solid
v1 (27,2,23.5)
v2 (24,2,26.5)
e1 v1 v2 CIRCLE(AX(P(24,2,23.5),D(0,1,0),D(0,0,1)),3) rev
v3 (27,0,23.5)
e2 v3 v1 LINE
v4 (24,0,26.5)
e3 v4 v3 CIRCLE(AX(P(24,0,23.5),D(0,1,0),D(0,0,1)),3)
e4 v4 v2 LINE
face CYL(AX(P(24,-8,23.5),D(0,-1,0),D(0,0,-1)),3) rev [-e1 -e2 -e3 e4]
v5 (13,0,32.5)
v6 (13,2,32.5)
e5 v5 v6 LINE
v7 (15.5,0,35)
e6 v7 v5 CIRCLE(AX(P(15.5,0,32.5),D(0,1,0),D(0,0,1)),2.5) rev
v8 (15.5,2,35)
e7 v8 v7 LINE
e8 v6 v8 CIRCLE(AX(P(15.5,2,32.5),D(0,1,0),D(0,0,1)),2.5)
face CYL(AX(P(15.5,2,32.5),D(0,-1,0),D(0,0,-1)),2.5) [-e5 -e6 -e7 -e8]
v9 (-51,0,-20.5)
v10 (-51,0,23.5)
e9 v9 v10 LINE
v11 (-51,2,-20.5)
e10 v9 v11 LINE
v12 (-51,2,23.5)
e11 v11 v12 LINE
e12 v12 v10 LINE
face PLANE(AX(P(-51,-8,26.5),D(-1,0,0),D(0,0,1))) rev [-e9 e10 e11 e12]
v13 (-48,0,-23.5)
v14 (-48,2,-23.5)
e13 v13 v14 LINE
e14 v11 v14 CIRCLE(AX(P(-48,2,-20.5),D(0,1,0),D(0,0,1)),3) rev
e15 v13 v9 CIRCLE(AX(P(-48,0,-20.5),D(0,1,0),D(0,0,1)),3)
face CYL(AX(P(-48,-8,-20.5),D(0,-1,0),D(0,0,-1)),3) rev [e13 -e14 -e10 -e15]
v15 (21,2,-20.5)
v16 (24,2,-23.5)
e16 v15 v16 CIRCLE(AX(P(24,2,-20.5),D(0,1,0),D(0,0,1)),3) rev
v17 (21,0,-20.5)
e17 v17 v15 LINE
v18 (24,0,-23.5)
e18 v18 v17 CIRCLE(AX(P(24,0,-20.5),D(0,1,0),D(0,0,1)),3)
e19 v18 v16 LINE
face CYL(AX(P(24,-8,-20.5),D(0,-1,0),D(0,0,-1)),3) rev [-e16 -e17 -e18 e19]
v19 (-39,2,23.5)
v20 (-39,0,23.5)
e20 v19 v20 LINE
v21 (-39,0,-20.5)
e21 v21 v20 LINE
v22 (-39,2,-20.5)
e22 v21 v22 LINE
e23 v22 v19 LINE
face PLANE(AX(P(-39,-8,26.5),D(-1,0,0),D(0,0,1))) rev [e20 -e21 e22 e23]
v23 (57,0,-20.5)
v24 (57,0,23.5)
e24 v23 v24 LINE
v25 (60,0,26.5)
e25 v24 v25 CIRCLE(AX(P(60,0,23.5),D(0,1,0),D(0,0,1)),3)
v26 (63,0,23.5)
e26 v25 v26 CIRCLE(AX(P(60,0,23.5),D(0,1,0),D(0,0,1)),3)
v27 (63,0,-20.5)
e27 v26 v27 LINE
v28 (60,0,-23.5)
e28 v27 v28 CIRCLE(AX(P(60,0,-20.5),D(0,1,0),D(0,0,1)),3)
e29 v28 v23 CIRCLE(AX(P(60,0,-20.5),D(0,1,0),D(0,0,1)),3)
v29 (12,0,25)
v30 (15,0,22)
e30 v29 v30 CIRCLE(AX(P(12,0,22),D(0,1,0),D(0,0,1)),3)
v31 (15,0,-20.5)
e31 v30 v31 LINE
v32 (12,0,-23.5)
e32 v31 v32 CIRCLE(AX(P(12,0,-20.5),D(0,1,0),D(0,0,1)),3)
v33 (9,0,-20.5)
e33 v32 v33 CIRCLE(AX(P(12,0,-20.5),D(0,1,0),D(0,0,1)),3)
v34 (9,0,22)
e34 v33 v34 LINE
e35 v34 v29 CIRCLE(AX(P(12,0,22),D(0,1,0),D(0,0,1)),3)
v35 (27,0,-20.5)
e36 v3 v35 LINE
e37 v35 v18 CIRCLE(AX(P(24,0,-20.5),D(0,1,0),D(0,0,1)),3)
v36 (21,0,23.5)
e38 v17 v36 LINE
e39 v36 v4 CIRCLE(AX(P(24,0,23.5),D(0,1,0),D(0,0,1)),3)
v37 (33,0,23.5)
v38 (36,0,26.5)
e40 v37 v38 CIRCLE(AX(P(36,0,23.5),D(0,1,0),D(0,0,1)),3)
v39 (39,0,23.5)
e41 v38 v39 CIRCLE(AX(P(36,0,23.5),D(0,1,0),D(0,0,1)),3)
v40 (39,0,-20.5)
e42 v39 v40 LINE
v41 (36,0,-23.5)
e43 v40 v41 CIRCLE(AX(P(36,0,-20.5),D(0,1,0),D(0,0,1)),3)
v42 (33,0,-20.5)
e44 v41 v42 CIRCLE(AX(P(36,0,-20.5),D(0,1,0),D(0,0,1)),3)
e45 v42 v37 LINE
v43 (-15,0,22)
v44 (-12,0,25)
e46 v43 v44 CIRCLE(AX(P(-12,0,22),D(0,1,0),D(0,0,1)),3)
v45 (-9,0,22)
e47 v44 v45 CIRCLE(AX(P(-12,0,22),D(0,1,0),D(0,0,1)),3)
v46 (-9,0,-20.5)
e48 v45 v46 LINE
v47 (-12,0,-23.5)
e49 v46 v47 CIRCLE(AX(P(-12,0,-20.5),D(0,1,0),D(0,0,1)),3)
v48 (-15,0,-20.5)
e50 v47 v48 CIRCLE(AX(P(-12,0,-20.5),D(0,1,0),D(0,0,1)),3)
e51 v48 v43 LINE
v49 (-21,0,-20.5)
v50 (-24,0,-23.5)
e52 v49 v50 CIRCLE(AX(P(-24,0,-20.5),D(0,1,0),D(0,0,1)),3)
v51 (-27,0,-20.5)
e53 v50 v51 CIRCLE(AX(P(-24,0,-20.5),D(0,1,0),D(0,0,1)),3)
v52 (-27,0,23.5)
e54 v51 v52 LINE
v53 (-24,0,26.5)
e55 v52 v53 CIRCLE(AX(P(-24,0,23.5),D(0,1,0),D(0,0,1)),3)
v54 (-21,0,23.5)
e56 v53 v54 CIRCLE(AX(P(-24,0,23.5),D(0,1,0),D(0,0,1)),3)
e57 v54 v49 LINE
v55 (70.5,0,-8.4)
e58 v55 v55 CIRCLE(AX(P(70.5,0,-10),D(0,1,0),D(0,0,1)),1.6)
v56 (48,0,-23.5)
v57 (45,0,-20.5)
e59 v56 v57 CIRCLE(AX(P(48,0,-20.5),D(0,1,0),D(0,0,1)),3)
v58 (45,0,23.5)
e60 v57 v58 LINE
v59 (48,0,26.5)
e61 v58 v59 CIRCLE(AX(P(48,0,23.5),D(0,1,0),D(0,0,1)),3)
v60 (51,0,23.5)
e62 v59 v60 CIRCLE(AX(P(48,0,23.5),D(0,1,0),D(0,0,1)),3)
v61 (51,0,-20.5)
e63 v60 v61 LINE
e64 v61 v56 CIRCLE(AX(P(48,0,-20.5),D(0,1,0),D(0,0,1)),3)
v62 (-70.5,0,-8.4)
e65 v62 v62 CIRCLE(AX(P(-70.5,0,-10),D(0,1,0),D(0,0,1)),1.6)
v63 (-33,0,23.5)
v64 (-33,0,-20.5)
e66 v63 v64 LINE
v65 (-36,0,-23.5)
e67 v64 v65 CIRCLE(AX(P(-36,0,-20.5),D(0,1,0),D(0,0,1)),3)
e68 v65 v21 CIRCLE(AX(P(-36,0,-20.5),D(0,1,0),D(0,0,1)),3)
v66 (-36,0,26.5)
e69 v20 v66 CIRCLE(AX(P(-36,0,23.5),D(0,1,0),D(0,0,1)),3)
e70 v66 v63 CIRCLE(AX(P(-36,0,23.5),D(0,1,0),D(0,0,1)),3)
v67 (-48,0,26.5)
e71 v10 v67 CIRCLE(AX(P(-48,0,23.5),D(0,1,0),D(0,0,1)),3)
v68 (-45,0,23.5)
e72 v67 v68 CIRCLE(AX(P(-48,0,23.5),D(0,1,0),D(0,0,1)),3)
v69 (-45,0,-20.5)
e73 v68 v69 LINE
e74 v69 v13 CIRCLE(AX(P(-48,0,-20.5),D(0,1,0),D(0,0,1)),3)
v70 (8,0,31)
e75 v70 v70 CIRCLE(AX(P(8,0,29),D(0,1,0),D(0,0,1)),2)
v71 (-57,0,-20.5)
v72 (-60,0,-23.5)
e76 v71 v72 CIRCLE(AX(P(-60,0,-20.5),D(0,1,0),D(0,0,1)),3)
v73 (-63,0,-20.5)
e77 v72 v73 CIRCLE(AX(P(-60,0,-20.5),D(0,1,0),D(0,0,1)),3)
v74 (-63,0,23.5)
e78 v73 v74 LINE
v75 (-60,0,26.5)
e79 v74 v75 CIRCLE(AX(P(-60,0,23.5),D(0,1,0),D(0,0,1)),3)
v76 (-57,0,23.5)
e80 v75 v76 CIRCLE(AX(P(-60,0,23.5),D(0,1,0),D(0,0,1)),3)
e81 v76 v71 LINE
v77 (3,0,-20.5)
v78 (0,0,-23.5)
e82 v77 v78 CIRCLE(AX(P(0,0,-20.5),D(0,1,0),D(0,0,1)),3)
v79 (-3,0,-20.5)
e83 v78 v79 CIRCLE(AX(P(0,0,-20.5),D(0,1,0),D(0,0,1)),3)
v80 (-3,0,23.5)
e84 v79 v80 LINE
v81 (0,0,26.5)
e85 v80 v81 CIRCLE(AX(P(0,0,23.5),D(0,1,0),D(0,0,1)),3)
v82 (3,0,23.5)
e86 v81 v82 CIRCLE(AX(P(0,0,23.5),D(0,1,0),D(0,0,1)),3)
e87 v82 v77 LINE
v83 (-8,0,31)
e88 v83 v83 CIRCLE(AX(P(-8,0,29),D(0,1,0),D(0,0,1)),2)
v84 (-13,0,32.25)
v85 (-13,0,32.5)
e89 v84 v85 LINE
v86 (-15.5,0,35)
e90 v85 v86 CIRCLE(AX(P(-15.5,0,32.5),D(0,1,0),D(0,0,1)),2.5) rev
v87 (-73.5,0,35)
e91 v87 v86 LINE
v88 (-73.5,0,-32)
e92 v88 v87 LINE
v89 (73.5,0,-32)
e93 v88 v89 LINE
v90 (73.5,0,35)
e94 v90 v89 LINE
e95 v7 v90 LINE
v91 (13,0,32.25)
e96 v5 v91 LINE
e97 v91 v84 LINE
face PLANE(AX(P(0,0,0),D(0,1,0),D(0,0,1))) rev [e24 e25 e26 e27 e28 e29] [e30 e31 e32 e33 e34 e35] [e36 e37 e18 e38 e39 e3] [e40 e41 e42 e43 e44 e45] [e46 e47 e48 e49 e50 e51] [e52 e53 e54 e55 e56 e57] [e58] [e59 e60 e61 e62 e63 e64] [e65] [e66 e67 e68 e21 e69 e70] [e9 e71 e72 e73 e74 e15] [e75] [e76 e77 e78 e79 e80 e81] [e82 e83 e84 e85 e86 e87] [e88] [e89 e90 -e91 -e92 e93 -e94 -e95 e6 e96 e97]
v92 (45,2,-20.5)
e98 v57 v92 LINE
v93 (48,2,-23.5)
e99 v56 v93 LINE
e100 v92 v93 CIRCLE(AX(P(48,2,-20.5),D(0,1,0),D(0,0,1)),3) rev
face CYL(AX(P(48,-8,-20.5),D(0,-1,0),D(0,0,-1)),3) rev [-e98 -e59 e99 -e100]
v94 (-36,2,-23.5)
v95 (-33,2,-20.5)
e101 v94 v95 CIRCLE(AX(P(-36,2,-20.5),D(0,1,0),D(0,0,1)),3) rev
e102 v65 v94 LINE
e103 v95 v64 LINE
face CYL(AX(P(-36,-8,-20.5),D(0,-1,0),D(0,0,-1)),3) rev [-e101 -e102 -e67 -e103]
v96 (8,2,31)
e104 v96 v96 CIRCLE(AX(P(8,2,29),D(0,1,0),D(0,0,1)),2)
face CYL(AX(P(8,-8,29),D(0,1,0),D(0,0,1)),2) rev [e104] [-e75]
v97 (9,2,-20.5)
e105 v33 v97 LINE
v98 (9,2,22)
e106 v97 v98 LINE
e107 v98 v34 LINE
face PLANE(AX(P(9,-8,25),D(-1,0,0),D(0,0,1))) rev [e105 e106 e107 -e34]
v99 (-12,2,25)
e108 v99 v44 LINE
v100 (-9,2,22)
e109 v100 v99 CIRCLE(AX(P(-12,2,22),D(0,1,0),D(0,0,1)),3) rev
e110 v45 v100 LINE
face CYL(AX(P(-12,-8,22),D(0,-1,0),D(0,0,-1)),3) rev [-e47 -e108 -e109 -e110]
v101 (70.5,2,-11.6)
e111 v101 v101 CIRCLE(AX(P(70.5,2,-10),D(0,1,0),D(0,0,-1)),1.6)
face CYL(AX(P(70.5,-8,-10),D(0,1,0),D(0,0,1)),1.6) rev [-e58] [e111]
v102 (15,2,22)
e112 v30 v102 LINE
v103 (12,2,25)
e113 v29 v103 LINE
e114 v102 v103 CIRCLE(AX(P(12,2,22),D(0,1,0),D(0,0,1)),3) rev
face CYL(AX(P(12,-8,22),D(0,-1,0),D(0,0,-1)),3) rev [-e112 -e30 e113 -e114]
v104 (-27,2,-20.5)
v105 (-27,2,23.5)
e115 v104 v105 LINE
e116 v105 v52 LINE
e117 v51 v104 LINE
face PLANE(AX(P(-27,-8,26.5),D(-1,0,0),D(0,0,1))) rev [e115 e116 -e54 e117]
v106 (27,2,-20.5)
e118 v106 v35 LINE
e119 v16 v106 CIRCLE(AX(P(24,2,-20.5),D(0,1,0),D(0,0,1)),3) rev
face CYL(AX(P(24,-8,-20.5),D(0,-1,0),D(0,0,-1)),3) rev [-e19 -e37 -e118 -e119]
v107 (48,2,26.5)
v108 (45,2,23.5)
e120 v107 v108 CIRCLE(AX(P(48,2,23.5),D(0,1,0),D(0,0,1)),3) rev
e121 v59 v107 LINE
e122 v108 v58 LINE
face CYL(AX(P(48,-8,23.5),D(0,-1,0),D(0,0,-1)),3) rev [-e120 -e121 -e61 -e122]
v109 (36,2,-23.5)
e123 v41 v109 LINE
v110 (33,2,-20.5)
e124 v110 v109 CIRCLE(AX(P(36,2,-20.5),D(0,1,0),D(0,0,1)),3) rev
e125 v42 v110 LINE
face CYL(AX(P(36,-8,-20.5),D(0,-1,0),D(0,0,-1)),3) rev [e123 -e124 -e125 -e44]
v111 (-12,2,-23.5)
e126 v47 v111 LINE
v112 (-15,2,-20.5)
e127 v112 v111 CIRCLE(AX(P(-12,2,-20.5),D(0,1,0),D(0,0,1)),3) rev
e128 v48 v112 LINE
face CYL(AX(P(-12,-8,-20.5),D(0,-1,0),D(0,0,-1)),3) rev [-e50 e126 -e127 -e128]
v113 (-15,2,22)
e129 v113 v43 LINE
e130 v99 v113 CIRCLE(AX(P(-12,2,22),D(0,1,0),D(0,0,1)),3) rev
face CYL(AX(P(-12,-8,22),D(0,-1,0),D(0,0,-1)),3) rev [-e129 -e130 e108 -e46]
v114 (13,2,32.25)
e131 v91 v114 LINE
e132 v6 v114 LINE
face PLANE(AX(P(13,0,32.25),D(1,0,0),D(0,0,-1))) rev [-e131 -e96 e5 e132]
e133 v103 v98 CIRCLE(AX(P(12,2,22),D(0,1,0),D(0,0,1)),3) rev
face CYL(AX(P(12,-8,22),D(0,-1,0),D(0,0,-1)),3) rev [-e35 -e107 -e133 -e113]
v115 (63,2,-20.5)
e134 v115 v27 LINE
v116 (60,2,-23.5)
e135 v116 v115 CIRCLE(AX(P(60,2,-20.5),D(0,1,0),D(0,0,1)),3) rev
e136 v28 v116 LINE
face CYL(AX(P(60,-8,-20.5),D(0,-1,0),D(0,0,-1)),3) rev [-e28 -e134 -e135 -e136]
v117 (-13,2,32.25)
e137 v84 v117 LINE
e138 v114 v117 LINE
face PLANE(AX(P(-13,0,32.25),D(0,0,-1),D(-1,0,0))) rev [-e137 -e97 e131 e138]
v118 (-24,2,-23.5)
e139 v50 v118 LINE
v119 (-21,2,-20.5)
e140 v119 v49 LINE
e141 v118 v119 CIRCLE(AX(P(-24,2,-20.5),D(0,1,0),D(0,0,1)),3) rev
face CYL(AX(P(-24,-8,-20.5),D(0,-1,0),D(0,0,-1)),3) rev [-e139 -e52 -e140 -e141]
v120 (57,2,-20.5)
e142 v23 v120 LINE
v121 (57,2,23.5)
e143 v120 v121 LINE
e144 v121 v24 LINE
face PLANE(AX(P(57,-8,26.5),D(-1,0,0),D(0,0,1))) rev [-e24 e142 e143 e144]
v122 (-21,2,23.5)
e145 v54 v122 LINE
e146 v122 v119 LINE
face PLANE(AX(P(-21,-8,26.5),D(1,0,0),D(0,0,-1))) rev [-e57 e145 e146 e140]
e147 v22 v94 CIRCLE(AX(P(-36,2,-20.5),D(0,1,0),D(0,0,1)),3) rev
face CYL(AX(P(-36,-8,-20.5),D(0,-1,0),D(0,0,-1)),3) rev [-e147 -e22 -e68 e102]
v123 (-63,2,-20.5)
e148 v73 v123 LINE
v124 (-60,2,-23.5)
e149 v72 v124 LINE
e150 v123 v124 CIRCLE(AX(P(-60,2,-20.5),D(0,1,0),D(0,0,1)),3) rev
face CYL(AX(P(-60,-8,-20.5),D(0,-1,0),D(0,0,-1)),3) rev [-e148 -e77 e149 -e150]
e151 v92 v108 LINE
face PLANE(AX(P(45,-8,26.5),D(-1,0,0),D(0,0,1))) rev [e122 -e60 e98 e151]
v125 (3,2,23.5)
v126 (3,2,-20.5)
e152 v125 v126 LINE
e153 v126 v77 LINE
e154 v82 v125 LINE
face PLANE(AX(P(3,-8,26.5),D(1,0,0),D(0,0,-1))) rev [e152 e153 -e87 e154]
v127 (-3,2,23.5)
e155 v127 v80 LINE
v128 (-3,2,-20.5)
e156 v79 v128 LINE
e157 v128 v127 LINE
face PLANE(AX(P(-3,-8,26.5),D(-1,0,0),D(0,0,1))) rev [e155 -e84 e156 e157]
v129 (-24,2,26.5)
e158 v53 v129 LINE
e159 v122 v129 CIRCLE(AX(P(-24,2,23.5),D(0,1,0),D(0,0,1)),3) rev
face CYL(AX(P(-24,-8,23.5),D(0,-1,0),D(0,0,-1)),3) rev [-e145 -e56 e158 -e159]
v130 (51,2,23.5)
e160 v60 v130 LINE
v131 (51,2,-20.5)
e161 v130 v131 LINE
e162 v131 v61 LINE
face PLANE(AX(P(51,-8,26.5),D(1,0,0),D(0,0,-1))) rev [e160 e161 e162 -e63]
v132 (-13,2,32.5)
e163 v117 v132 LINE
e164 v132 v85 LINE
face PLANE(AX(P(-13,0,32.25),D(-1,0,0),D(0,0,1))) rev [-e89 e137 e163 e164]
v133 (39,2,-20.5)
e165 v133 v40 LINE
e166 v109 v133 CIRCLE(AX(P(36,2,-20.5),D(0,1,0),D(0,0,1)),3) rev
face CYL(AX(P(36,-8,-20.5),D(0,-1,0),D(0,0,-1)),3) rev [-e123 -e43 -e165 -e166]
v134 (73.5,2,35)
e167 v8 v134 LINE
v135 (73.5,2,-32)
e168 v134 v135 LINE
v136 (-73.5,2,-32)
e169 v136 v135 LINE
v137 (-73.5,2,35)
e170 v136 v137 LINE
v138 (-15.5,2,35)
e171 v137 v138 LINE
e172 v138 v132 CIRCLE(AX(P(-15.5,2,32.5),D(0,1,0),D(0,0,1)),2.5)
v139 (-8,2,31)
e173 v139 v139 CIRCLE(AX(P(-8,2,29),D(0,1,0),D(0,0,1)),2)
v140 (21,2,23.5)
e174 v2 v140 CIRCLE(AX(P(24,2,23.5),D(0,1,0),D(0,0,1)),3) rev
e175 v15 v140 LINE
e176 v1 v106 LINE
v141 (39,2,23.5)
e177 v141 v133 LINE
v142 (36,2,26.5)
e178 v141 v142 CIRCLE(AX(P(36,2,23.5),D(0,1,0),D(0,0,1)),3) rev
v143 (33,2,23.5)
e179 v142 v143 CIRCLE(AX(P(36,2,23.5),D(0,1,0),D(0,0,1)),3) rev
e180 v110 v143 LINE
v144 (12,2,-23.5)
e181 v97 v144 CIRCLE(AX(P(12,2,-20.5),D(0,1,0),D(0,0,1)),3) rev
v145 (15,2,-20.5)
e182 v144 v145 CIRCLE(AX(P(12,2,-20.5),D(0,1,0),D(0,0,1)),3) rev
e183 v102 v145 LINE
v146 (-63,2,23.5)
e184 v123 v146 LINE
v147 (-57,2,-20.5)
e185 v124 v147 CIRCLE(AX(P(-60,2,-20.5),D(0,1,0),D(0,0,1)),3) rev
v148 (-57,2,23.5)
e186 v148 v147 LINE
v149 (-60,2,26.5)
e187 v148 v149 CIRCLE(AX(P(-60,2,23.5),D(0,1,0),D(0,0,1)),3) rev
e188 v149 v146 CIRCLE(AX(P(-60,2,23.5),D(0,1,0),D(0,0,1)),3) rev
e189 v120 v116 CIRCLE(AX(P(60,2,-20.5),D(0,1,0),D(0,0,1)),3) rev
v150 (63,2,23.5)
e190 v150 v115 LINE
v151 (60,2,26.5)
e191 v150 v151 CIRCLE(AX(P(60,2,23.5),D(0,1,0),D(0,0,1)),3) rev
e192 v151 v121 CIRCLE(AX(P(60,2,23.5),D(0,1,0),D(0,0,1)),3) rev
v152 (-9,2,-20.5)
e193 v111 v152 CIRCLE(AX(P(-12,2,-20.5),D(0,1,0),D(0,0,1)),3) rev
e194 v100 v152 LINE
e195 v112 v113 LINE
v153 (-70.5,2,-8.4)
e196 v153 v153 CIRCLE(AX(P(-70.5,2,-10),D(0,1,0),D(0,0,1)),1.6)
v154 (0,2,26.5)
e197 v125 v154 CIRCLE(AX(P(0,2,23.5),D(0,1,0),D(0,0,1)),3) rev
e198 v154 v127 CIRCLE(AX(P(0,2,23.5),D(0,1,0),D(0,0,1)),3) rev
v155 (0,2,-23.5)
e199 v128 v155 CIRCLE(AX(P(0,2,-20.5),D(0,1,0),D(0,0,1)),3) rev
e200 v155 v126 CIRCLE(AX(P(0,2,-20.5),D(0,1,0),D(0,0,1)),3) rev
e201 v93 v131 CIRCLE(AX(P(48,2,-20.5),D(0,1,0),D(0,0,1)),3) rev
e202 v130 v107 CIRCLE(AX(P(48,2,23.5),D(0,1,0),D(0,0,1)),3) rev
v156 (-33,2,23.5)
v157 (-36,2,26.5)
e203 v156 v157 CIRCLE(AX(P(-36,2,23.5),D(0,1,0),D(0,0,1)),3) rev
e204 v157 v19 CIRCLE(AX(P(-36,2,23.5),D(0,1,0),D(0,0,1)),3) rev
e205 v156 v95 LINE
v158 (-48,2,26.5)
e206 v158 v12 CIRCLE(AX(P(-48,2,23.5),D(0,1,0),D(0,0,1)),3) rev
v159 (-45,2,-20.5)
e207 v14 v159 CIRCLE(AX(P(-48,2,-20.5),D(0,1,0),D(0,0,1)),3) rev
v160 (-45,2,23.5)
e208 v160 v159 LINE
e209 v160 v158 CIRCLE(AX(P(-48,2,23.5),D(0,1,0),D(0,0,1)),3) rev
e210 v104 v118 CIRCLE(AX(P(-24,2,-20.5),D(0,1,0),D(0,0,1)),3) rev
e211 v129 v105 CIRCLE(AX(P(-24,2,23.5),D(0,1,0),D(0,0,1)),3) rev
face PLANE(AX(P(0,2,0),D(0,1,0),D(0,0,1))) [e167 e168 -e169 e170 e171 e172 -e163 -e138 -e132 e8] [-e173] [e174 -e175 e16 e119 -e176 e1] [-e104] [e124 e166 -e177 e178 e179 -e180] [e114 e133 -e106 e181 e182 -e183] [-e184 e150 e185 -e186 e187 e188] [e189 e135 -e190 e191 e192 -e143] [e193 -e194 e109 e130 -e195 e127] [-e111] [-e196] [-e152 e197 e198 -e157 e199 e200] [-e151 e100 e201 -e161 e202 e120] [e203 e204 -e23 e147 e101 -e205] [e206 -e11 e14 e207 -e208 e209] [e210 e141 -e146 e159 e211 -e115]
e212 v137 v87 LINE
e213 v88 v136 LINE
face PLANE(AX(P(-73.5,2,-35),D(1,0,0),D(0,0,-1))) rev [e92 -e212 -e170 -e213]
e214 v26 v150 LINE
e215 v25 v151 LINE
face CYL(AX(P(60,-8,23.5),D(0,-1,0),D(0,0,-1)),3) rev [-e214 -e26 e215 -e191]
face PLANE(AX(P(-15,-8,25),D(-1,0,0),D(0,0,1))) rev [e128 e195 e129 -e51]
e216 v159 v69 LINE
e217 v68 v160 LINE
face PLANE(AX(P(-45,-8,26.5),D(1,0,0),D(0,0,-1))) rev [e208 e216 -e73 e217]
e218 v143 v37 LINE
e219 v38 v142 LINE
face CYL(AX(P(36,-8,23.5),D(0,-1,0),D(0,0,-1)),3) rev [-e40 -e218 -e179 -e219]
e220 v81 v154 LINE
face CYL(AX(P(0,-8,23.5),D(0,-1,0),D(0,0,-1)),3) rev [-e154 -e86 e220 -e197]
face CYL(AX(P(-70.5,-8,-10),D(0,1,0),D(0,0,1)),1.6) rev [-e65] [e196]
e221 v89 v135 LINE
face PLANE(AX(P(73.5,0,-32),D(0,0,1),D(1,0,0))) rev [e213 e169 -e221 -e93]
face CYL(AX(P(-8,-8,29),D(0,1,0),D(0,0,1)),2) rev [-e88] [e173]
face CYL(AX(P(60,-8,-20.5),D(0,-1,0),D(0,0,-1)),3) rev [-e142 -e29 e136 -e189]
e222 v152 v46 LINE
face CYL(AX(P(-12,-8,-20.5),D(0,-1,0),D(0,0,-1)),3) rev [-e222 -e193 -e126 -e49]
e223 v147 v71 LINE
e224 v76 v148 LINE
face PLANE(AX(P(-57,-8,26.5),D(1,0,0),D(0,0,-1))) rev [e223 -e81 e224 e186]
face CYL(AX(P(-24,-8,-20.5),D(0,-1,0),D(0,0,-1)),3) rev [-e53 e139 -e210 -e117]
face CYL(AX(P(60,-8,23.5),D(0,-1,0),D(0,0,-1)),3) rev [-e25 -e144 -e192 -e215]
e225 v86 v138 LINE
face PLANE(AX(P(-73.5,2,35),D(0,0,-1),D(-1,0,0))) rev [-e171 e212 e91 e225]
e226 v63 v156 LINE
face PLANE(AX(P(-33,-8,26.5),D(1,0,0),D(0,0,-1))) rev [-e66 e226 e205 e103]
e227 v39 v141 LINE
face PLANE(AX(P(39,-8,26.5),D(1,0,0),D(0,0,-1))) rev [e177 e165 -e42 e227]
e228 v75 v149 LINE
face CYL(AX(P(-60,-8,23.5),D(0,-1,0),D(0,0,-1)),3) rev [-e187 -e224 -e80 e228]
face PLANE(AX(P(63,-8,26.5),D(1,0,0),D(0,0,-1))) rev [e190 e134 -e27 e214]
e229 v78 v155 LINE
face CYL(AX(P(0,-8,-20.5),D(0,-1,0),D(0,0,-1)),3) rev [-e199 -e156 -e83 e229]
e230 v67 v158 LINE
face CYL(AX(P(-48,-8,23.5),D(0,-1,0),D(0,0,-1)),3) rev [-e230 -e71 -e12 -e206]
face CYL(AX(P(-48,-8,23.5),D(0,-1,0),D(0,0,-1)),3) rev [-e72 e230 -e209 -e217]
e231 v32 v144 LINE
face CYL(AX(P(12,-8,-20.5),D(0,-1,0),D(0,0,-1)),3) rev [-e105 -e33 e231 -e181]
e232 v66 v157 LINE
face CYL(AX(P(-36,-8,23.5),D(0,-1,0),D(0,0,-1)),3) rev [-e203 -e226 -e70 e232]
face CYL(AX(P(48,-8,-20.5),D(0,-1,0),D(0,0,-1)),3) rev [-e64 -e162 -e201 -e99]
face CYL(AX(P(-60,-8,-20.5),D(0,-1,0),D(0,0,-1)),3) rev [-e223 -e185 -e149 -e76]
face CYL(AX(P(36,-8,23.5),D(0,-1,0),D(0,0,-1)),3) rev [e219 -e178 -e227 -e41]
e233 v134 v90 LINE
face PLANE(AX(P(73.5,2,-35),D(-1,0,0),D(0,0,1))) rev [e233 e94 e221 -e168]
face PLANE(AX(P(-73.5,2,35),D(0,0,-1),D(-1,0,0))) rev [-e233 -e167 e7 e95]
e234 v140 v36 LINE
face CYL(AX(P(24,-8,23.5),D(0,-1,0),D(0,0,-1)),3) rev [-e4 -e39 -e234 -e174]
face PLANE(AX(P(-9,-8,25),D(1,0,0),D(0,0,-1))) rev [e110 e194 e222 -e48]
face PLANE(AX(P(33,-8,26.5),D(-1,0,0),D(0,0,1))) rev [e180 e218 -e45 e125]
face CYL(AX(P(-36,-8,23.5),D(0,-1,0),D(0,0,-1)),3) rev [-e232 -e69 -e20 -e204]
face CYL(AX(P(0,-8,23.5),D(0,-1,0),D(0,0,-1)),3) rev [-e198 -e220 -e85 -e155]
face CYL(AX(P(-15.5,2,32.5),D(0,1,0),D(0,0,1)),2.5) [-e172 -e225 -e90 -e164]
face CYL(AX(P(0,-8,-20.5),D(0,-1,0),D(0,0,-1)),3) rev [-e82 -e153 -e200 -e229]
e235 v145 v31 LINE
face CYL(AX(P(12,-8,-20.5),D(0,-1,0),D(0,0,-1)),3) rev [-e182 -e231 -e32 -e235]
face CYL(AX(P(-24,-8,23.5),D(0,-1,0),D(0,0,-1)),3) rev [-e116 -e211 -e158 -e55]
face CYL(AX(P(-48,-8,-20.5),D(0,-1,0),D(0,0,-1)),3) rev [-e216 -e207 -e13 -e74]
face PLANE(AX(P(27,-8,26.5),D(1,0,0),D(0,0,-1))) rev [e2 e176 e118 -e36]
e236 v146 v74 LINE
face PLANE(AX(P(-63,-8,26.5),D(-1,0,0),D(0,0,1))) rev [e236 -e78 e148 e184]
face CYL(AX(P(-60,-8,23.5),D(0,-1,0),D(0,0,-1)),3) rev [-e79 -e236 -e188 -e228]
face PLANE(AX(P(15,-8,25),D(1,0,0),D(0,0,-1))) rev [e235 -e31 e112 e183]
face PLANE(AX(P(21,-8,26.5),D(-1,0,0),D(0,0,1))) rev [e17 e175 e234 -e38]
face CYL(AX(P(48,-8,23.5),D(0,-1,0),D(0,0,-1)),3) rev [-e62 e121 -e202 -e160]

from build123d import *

# Parameters (mm, degrees)
SKETCH_1_W          = 147
SKETCH_1_H          = 70
EXTRUDE_1_DEPTH     = 2
SKETCH_3_W          = 147
SKETCH_3_H          = 3
CUT_EXTRUDE_1_DEPTH = 82.432487375
SKETCH_5_R          = 2
CUT_EXTRUDE_3_DEPTH = 10
SKETCH_6_R          = 1.6
CUT_EXTRUDE_4_DEPTH = 10
SKETCH_7_W          = 6
SKETCH_7_H          = 48.5
SKETCH_7_H_2        = 50
CUT_EXTRUDE_5_DEPTH = 10
FILLET_1_R          = 3
SKETCH_8_W          = 26
SKETCH_8_H          = 5.5
CUT_EXTRUDE_6_DEPTH = 82.432487375
FILLET_2_R          = 2.5


with BuildPart() as part:
    # 草图1 → 凸台-拉伸1 (new body)
    with BuildSketch(Plane(origin=(0, 0, 0), x_dir=(1, 0, 0), z_dir=(0, 1, 0))):
        Rectangle(SKETCH_1_W, SKETCH_1_H)
    extrude(amount=EXTRUDE_1_DEPTH)

    # 草图3 → 切除-拉伸1 (cut, through all)
    with BuildSketch(Plane(origin=(0, 2, 0), x_dir=(1, 0, 0), z_dir=(0, 1, 0))):
        with Locations((0, 33.5)):
            Rectangle(SKETCH_3_W, SKETCH_3_H)
    extrude(amount=-CUT_EXTRUDE_1_DEPTH, mode=Mode.SUBTRACT)

    # 草图5 → 切除-拉伸3 (cut)
    with BuildSketch(Plane(origin=(0, 2, 0), x_dir=(1, 0, 0), z_dir=(0, 1, 0))):
        with Locations(Location((-8, -29, 0), (0, 0, 270))):
            Circle(SKETCH_5_R)
        with Locations(Location((8, -29, 0), (0, 0, 270))):
            Circle(SKETCH_5_R)
    extrude(amount=-CUT_EXTRUDE_3_DEPTH, mode=Mode.SUBTRACT)

    # 草图6 → 切除-拉伸4 (cut)
    with BuildSketch(Plane(origin=(0, 2, 0), x_dir=(1, 0, 0), z_dir=(0, 1, 0))):
        with Locations(Location((-70.5, 10, 0), (0, 0, 270))):
            Circle(SKETCH_6_R)
        with Locations(Location((70.5, 10, 0), (0, 0, 270))):
            Circle(SKETCH_6_R)
    extrude(amount=-CUT_EXTRUDE_4_DEPTH, mode=Mode.SUBTRACT)

    # 草图7 → 切除-拉伸5 (cut)
    with BuildSketch(Plane(origin=(0, 2, 0), x_dir=(1, 0, 0), z_dir=(0, 1, 0))):
        with Locations((12, -0.75)):
            Rectangle(SKETCH_7_W, SKETCH_7_H)
        with Locations((0, -1.5)):
            Rectangle(SKETCH_7_W, SKETCH_7_H_2)
        with Locations((24, -1.5)):
            Rectangle(SKETCH_7_W, SKETCH_7_H_2)
        with Locations((36, -1.5)):
            Rectangle(SKETCH_7_W, SKETCH_7_H_2)
        with Locations((48, -1.5)):
            Rectangle(SKETCH_7_W, SKETCH_7_H_2)
        with Locations((60, -1.5)):
            Rectangle(SKETCH_7_W, SKETCH_7_H_2)
        with Locations((-12, -0.75)):
            Rectangle(SKETCH_7_W, SKETCH_7_H)
        with Locations((-24, -1.5)):
            Rectangle(SKETCH_7_W, SKETCH_7_H_2)
        with Locations((-36, -1.5)):
            Rectangle(SKETCH_7_W, SKETCH_7_H_2)
        with Locations((-48, -1.5)):
            Rectangle(SKETCH_7_W, SKETCH_7_H_2)
        with Locations((-60, -1.5)):
            Rectangle(SKETCH_7_W, SKETCH_7_H_2)
    extrude(amount=-CUT_EXTRUDE_5_DEPTH, mode=Mode.SUBTRACT)

    # 圆角1
    fillet_1_edges = [part.edges().sort_by_distance(p)[0] for p in [
        (-63, 1, -23.5),
        (-57, 1, -23.5),
        (-57, 1, 26.5),
        (-63, 1, 26.5),
        (-27, 1, -23.5),
        (-39, 1, -23.5),
        (-51, 1, -23.5),
        (-3, 1, -23.5),
        (-15, 1, -23.5),
        (9, 1, -23.5),
        (33, 1, -23.5),
        (21, 1, -23.5),
        (45, 1, -23.5),
        (57, 1, -23.5),
        (63, 1, -23.5),
        (51, 1, -23.5),
        (39, 1, -23.5),
        (27, 1, -23.5),
        (15, 1, -23.5),
        (3, 1, -23.5),
        (-9, 1, -23.5),
        (-21, 1, -23.5),
        (-33, 1, -23.5),
        (-45, 1, -23.5),
        (-45, 1, 26.5),
        (-33, 1, 26.5),
        (-21, 1, 26.5),
        (3, 1, 26.5),
        (27, 1, 26.5),
        (39, 1, 26.5),
        (51, 1, 26.5),
        (63, 1, 26.5),
        (21, 1, 26.5),
        (33, 1, 26.5),
        (45, 1, 26.5),
        (57, 1, 26.5),
        (-3, 1, 26.5),
        (-27, 1, 26.5),
        (-39, 1, 26.5),
        (-51, 1, 26.5),
        (15, 1, 25),
        (9, 1, 25),
        (-15, 1, 25),
        (-9, 1, 25),
    ]]
    fillet(fillet_1_edges, radius=FILLET_1_R - 0.0001)  # a hair under: the kernel refuses the full size

    # 草图8 → 切除-拉伸6 (cut, through all)
    with BuildSketch(Plane(origin=(0, 2, 0), x_dir=(1, 0, 0), z_dir=(0, 1, 0))):
        with Locations((0, -35)):
            Rectangle(SKETCH_8_W, SKETCH_8_H)
    extrude(amount=-CUT_EXTRUDE_6_DEPTH, mode=Mode.SUBTRACT)

    # 圆角2
    fillet_2_edges = [part.edges().sort_by_distance(p)[0] for p in [
        (13, 1, 35),
        (-13, 1, 35),
    ]]
    fillet(fillet_2_edges, radius=FILLET_2_R)


solid = part.part
